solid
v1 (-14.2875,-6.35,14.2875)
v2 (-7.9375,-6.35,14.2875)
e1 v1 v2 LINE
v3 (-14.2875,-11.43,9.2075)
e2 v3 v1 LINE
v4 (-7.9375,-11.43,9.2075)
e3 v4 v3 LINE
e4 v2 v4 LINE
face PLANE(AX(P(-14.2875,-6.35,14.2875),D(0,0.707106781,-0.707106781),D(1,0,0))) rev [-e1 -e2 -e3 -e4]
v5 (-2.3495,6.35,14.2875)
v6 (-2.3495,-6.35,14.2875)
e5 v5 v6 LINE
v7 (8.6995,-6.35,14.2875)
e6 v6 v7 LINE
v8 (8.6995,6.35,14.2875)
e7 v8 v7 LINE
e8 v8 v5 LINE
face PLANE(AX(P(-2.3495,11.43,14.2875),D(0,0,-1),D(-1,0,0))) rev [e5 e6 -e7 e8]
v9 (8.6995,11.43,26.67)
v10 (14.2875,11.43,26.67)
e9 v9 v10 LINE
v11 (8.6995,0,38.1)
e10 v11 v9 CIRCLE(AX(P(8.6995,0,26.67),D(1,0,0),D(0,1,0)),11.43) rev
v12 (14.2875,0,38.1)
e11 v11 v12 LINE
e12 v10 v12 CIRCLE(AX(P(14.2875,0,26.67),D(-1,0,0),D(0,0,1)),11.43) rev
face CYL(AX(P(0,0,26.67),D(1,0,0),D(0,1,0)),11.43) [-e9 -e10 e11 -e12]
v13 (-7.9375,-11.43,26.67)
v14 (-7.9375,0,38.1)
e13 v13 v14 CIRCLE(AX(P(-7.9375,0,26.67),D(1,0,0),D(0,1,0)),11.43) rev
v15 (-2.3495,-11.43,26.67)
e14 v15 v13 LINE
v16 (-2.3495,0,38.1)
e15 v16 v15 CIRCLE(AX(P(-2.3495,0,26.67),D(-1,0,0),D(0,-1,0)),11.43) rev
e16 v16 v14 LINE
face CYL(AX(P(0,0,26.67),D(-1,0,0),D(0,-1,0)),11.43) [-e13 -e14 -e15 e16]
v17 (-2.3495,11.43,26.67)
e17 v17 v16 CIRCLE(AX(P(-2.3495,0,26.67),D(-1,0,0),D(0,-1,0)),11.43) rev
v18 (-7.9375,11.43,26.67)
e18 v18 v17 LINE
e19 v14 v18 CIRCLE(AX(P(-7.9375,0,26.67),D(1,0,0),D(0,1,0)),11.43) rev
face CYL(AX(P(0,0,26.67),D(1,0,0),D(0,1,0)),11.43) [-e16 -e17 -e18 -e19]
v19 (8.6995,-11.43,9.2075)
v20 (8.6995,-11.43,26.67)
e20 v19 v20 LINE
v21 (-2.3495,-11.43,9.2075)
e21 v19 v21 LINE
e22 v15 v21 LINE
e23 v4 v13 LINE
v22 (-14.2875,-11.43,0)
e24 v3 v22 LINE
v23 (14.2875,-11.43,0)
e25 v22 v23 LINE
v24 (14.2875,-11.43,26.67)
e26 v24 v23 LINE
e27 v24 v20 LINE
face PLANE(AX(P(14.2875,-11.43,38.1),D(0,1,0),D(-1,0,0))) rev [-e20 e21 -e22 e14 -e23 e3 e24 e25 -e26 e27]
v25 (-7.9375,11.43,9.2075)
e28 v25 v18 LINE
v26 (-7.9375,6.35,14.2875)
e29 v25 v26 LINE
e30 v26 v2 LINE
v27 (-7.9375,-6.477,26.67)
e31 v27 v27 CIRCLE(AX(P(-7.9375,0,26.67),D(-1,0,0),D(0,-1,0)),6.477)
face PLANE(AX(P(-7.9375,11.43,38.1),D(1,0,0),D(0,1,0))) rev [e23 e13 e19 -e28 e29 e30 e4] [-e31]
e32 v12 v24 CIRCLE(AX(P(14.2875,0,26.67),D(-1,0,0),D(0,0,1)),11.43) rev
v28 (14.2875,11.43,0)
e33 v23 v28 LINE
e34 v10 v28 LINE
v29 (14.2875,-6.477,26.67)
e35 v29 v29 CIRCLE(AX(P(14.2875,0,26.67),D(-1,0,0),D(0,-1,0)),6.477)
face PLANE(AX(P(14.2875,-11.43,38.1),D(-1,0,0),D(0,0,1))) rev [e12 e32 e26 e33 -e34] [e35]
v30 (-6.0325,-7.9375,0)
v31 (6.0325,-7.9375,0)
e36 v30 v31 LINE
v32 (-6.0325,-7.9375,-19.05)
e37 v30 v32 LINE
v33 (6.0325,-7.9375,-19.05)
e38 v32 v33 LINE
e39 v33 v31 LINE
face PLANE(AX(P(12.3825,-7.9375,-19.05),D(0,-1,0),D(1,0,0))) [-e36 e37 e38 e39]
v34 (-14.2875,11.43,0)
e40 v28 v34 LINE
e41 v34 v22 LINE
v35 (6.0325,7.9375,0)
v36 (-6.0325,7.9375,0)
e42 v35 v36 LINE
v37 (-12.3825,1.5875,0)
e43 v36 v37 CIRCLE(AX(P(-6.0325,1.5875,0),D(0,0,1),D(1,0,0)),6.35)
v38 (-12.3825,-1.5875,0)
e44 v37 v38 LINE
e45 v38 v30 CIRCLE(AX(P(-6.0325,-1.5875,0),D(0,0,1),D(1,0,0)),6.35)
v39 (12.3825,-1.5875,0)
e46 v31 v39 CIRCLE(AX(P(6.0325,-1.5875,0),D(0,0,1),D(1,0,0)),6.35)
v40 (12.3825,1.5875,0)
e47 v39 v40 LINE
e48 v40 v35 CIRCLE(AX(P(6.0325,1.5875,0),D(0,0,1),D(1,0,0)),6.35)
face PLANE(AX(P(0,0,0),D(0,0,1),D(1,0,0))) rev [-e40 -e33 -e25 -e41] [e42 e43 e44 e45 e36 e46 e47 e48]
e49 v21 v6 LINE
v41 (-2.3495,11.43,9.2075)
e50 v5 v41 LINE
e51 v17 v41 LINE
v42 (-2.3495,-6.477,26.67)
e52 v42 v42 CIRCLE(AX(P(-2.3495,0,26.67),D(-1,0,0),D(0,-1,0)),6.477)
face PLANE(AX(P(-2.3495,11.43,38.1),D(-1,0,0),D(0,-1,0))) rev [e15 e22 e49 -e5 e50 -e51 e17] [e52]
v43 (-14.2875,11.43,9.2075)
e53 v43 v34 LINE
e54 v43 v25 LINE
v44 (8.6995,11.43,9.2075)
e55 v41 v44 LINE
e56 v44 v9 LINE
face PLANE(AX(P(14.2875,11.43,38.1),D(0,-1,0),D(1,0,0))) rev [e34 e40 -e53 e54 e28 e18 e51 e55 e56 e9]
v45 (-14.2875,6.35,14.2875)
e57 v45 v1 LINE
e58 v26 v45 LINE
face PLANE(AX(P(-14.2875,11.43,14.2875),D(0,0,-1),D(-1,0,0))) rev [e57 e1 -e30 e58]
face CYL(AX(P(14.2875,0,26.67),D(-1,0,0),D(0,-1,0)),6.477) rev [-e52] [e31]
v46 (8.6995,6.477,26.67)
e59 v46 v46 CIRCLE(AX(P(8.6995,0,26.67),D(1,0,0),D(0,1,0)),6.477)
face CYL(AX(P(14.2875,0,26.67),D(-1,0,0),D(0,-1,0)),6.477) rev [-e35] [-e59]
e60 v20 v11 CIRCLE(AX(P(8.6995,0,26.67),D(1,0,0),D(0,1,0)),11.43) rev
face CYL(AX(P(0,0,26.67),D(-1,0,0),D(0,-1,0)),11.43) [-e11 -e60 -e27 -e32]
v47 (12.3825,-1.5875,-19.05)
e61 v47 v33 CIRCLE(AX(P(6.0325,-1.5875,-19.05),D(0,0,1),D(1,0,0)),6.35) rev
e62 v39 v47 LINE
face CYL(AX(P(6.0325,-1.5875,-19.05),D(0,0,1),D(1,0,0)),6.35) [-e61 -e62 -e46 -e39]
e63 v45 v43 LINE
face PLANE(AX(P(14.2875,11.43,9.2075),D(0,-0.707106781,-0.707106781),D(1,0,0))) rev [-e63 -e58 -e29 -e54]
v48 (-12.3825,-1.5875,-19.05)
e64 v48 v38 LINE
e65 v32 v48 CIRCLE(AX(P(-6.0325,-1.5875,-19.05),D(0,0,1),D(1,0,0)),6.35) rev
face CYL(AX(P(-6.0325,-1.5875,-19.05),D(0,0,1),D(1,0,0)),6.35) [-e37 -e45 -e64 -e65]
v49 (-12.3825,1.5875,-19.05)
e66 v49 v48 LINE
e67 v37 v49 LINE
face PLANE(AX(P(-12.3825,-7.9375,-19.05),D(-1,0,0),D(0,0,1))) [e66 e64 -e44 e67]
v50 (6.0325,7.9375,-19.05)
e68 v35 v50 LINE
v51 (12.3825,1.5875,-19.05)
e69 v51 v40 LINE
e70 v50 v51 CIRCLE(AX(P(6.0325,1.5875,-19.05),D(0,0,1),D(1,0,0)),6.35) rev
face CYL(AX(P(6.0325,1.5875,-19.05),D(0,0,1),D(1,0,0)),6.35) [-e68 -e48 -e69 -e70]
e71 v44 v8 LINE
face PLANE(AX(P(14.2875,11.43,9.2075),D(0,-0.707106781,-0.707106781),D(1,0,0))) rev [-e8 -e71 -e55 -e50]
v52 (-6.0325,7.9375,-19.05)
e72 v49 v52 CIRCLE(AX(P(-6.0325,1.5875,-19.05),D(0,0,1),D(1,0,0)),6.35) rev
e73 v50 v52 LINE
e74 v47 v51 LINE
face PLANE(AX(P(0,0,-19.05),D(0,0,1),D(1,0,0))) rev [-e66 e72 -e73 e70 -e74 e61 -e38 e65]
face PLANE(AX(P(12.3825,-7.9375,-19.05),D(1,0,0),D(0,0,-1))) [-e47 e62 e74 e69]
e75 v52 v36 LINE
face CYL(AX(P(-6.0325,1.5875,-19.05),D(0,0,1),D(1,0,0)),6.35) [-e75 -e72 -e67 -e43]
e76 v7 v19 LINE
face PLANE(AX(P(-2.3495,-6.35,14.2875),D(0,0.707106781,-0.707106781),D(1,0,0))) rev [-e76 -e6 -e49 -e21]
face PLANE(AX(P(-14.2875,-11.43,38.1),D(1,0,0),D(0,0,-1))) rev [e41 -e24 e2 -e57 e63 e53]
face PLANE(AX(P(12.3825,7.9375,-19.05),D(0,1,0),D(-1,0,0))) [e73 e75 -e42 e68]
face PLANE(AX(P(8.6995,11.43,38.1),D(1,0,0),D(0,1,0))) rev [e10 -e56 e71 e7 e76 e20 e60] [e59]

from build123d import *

# Parameters (mm, degrees)
SKETCH2_W           = 24.765
SKETCH2_H           = 15.875
BOSS_EXTRUDE1_DEPTH = 19.05
SKETCH3_W           = 28.575
SKETCH3_H           = 22.86
BOSS_EXTRUDE2_DEPTH = 38.1
SKETCH4_W           = 6.35
SKETCH4_H           = 23.8125
SKETCH4_W_2         = 11.049
CUT_EXTRUDE1_DEPTH  = 47.6725
FILLET5_R           = 11.43
SKETCH7_R           = 6.477
CUT_EXTRUDE3_DEPTH  = 46.56539833
FILLET3_R           = 6.35
CHAMFER1_SIZE       = 5.08


with BuildPart() as part:
    # Sketch2 → Boss-Extrude1 (new body)
    with BuildSketch(Plane.XY):
        Rectangle(SKETCH2_W, SKETCH2_H)
    extrude(amount=-BOSS_EXTRUDE1_DEPTH)

    # Sketch3 → Boss-Extrude2 (add)
    with BuildSketch(Plane.XY):
        Rectangle(SKETCH3_W, SKETCH3_H)
    extrude(amount=BOSS_EXTRUDE2_DEPTH)

    # Sketch4 → Cut-Extrude1 (cut, through all)
    with BuildSketch(Plane(origin=(0, -11.43, 0), x_dir=(-1, 0, 0), z_dir=(0, -1, 0))):
        with Locations((11.1125, -26.19375)):
            Rectangle(SKETCH4_W, SKETCH4_H)
        with Locations((-3.175, -26.19375)):
            Rectangle(SKETCH4_W_2, SKETCH4_H)
    extrude(amount=-CUT_EXTRUDE1_DEPTH, mode=Mode.SUBTRACT)

    # Fillet5
    fillet5_edges = [part.edges().sort_by_distance(p)[0] for p in [
        (-5.1435, -11.43, 38.1),
        (-5.1435, 11.43, 38.1),
        (11.4935, 11.43, 38.1),
        (11.4935, -11.43, 38.1),
    ]]
    fillet(fillet5_edges, radius=FILLET5_R - 0.0001)  # a hair under: the kernel refuses the full size

    # Sketch7 → Cut-Extrude3 (cut, through all)
    with BuildSketch(Plane.ZY.offset(7.9375)):
        with Locations(Location((26.67, 0, 0), (0, 0, 270))):
            Circle(SKETCH7_R)
    extrude(amount=-CUT_EXTRUDE3_DEPTH, mode=Mode.SUBTRACT)

    # Fillet3
    fillet3_edges = [part.edges().sort_by_distance(p)[0] for p in [
        (-12.3825, 7.9375, -9.525),
        (12.3825, 7.9375, -9.525),
        (12.3825, -7.9375, -9.525),
        (-12.3825, -7.9375, -9.525),
    ]]
    fillet(fillet3_edges, radius=FILLET3_R)

    # Chamfer1
    chamfer1_edges = [part.edges().sort_by_distance(p)[0] for p in [
        (-11.1125, 11.43, 14.2875),
        (-11.1125, -11.43, 14.2875),
        (3.175, 11.43, 14.2875),
        (3.175, -11.43, 14.2875),
    ]]
    chamfer(chamfer1_edges, length=CHAMFER1_SIZE)


solid = part.part
